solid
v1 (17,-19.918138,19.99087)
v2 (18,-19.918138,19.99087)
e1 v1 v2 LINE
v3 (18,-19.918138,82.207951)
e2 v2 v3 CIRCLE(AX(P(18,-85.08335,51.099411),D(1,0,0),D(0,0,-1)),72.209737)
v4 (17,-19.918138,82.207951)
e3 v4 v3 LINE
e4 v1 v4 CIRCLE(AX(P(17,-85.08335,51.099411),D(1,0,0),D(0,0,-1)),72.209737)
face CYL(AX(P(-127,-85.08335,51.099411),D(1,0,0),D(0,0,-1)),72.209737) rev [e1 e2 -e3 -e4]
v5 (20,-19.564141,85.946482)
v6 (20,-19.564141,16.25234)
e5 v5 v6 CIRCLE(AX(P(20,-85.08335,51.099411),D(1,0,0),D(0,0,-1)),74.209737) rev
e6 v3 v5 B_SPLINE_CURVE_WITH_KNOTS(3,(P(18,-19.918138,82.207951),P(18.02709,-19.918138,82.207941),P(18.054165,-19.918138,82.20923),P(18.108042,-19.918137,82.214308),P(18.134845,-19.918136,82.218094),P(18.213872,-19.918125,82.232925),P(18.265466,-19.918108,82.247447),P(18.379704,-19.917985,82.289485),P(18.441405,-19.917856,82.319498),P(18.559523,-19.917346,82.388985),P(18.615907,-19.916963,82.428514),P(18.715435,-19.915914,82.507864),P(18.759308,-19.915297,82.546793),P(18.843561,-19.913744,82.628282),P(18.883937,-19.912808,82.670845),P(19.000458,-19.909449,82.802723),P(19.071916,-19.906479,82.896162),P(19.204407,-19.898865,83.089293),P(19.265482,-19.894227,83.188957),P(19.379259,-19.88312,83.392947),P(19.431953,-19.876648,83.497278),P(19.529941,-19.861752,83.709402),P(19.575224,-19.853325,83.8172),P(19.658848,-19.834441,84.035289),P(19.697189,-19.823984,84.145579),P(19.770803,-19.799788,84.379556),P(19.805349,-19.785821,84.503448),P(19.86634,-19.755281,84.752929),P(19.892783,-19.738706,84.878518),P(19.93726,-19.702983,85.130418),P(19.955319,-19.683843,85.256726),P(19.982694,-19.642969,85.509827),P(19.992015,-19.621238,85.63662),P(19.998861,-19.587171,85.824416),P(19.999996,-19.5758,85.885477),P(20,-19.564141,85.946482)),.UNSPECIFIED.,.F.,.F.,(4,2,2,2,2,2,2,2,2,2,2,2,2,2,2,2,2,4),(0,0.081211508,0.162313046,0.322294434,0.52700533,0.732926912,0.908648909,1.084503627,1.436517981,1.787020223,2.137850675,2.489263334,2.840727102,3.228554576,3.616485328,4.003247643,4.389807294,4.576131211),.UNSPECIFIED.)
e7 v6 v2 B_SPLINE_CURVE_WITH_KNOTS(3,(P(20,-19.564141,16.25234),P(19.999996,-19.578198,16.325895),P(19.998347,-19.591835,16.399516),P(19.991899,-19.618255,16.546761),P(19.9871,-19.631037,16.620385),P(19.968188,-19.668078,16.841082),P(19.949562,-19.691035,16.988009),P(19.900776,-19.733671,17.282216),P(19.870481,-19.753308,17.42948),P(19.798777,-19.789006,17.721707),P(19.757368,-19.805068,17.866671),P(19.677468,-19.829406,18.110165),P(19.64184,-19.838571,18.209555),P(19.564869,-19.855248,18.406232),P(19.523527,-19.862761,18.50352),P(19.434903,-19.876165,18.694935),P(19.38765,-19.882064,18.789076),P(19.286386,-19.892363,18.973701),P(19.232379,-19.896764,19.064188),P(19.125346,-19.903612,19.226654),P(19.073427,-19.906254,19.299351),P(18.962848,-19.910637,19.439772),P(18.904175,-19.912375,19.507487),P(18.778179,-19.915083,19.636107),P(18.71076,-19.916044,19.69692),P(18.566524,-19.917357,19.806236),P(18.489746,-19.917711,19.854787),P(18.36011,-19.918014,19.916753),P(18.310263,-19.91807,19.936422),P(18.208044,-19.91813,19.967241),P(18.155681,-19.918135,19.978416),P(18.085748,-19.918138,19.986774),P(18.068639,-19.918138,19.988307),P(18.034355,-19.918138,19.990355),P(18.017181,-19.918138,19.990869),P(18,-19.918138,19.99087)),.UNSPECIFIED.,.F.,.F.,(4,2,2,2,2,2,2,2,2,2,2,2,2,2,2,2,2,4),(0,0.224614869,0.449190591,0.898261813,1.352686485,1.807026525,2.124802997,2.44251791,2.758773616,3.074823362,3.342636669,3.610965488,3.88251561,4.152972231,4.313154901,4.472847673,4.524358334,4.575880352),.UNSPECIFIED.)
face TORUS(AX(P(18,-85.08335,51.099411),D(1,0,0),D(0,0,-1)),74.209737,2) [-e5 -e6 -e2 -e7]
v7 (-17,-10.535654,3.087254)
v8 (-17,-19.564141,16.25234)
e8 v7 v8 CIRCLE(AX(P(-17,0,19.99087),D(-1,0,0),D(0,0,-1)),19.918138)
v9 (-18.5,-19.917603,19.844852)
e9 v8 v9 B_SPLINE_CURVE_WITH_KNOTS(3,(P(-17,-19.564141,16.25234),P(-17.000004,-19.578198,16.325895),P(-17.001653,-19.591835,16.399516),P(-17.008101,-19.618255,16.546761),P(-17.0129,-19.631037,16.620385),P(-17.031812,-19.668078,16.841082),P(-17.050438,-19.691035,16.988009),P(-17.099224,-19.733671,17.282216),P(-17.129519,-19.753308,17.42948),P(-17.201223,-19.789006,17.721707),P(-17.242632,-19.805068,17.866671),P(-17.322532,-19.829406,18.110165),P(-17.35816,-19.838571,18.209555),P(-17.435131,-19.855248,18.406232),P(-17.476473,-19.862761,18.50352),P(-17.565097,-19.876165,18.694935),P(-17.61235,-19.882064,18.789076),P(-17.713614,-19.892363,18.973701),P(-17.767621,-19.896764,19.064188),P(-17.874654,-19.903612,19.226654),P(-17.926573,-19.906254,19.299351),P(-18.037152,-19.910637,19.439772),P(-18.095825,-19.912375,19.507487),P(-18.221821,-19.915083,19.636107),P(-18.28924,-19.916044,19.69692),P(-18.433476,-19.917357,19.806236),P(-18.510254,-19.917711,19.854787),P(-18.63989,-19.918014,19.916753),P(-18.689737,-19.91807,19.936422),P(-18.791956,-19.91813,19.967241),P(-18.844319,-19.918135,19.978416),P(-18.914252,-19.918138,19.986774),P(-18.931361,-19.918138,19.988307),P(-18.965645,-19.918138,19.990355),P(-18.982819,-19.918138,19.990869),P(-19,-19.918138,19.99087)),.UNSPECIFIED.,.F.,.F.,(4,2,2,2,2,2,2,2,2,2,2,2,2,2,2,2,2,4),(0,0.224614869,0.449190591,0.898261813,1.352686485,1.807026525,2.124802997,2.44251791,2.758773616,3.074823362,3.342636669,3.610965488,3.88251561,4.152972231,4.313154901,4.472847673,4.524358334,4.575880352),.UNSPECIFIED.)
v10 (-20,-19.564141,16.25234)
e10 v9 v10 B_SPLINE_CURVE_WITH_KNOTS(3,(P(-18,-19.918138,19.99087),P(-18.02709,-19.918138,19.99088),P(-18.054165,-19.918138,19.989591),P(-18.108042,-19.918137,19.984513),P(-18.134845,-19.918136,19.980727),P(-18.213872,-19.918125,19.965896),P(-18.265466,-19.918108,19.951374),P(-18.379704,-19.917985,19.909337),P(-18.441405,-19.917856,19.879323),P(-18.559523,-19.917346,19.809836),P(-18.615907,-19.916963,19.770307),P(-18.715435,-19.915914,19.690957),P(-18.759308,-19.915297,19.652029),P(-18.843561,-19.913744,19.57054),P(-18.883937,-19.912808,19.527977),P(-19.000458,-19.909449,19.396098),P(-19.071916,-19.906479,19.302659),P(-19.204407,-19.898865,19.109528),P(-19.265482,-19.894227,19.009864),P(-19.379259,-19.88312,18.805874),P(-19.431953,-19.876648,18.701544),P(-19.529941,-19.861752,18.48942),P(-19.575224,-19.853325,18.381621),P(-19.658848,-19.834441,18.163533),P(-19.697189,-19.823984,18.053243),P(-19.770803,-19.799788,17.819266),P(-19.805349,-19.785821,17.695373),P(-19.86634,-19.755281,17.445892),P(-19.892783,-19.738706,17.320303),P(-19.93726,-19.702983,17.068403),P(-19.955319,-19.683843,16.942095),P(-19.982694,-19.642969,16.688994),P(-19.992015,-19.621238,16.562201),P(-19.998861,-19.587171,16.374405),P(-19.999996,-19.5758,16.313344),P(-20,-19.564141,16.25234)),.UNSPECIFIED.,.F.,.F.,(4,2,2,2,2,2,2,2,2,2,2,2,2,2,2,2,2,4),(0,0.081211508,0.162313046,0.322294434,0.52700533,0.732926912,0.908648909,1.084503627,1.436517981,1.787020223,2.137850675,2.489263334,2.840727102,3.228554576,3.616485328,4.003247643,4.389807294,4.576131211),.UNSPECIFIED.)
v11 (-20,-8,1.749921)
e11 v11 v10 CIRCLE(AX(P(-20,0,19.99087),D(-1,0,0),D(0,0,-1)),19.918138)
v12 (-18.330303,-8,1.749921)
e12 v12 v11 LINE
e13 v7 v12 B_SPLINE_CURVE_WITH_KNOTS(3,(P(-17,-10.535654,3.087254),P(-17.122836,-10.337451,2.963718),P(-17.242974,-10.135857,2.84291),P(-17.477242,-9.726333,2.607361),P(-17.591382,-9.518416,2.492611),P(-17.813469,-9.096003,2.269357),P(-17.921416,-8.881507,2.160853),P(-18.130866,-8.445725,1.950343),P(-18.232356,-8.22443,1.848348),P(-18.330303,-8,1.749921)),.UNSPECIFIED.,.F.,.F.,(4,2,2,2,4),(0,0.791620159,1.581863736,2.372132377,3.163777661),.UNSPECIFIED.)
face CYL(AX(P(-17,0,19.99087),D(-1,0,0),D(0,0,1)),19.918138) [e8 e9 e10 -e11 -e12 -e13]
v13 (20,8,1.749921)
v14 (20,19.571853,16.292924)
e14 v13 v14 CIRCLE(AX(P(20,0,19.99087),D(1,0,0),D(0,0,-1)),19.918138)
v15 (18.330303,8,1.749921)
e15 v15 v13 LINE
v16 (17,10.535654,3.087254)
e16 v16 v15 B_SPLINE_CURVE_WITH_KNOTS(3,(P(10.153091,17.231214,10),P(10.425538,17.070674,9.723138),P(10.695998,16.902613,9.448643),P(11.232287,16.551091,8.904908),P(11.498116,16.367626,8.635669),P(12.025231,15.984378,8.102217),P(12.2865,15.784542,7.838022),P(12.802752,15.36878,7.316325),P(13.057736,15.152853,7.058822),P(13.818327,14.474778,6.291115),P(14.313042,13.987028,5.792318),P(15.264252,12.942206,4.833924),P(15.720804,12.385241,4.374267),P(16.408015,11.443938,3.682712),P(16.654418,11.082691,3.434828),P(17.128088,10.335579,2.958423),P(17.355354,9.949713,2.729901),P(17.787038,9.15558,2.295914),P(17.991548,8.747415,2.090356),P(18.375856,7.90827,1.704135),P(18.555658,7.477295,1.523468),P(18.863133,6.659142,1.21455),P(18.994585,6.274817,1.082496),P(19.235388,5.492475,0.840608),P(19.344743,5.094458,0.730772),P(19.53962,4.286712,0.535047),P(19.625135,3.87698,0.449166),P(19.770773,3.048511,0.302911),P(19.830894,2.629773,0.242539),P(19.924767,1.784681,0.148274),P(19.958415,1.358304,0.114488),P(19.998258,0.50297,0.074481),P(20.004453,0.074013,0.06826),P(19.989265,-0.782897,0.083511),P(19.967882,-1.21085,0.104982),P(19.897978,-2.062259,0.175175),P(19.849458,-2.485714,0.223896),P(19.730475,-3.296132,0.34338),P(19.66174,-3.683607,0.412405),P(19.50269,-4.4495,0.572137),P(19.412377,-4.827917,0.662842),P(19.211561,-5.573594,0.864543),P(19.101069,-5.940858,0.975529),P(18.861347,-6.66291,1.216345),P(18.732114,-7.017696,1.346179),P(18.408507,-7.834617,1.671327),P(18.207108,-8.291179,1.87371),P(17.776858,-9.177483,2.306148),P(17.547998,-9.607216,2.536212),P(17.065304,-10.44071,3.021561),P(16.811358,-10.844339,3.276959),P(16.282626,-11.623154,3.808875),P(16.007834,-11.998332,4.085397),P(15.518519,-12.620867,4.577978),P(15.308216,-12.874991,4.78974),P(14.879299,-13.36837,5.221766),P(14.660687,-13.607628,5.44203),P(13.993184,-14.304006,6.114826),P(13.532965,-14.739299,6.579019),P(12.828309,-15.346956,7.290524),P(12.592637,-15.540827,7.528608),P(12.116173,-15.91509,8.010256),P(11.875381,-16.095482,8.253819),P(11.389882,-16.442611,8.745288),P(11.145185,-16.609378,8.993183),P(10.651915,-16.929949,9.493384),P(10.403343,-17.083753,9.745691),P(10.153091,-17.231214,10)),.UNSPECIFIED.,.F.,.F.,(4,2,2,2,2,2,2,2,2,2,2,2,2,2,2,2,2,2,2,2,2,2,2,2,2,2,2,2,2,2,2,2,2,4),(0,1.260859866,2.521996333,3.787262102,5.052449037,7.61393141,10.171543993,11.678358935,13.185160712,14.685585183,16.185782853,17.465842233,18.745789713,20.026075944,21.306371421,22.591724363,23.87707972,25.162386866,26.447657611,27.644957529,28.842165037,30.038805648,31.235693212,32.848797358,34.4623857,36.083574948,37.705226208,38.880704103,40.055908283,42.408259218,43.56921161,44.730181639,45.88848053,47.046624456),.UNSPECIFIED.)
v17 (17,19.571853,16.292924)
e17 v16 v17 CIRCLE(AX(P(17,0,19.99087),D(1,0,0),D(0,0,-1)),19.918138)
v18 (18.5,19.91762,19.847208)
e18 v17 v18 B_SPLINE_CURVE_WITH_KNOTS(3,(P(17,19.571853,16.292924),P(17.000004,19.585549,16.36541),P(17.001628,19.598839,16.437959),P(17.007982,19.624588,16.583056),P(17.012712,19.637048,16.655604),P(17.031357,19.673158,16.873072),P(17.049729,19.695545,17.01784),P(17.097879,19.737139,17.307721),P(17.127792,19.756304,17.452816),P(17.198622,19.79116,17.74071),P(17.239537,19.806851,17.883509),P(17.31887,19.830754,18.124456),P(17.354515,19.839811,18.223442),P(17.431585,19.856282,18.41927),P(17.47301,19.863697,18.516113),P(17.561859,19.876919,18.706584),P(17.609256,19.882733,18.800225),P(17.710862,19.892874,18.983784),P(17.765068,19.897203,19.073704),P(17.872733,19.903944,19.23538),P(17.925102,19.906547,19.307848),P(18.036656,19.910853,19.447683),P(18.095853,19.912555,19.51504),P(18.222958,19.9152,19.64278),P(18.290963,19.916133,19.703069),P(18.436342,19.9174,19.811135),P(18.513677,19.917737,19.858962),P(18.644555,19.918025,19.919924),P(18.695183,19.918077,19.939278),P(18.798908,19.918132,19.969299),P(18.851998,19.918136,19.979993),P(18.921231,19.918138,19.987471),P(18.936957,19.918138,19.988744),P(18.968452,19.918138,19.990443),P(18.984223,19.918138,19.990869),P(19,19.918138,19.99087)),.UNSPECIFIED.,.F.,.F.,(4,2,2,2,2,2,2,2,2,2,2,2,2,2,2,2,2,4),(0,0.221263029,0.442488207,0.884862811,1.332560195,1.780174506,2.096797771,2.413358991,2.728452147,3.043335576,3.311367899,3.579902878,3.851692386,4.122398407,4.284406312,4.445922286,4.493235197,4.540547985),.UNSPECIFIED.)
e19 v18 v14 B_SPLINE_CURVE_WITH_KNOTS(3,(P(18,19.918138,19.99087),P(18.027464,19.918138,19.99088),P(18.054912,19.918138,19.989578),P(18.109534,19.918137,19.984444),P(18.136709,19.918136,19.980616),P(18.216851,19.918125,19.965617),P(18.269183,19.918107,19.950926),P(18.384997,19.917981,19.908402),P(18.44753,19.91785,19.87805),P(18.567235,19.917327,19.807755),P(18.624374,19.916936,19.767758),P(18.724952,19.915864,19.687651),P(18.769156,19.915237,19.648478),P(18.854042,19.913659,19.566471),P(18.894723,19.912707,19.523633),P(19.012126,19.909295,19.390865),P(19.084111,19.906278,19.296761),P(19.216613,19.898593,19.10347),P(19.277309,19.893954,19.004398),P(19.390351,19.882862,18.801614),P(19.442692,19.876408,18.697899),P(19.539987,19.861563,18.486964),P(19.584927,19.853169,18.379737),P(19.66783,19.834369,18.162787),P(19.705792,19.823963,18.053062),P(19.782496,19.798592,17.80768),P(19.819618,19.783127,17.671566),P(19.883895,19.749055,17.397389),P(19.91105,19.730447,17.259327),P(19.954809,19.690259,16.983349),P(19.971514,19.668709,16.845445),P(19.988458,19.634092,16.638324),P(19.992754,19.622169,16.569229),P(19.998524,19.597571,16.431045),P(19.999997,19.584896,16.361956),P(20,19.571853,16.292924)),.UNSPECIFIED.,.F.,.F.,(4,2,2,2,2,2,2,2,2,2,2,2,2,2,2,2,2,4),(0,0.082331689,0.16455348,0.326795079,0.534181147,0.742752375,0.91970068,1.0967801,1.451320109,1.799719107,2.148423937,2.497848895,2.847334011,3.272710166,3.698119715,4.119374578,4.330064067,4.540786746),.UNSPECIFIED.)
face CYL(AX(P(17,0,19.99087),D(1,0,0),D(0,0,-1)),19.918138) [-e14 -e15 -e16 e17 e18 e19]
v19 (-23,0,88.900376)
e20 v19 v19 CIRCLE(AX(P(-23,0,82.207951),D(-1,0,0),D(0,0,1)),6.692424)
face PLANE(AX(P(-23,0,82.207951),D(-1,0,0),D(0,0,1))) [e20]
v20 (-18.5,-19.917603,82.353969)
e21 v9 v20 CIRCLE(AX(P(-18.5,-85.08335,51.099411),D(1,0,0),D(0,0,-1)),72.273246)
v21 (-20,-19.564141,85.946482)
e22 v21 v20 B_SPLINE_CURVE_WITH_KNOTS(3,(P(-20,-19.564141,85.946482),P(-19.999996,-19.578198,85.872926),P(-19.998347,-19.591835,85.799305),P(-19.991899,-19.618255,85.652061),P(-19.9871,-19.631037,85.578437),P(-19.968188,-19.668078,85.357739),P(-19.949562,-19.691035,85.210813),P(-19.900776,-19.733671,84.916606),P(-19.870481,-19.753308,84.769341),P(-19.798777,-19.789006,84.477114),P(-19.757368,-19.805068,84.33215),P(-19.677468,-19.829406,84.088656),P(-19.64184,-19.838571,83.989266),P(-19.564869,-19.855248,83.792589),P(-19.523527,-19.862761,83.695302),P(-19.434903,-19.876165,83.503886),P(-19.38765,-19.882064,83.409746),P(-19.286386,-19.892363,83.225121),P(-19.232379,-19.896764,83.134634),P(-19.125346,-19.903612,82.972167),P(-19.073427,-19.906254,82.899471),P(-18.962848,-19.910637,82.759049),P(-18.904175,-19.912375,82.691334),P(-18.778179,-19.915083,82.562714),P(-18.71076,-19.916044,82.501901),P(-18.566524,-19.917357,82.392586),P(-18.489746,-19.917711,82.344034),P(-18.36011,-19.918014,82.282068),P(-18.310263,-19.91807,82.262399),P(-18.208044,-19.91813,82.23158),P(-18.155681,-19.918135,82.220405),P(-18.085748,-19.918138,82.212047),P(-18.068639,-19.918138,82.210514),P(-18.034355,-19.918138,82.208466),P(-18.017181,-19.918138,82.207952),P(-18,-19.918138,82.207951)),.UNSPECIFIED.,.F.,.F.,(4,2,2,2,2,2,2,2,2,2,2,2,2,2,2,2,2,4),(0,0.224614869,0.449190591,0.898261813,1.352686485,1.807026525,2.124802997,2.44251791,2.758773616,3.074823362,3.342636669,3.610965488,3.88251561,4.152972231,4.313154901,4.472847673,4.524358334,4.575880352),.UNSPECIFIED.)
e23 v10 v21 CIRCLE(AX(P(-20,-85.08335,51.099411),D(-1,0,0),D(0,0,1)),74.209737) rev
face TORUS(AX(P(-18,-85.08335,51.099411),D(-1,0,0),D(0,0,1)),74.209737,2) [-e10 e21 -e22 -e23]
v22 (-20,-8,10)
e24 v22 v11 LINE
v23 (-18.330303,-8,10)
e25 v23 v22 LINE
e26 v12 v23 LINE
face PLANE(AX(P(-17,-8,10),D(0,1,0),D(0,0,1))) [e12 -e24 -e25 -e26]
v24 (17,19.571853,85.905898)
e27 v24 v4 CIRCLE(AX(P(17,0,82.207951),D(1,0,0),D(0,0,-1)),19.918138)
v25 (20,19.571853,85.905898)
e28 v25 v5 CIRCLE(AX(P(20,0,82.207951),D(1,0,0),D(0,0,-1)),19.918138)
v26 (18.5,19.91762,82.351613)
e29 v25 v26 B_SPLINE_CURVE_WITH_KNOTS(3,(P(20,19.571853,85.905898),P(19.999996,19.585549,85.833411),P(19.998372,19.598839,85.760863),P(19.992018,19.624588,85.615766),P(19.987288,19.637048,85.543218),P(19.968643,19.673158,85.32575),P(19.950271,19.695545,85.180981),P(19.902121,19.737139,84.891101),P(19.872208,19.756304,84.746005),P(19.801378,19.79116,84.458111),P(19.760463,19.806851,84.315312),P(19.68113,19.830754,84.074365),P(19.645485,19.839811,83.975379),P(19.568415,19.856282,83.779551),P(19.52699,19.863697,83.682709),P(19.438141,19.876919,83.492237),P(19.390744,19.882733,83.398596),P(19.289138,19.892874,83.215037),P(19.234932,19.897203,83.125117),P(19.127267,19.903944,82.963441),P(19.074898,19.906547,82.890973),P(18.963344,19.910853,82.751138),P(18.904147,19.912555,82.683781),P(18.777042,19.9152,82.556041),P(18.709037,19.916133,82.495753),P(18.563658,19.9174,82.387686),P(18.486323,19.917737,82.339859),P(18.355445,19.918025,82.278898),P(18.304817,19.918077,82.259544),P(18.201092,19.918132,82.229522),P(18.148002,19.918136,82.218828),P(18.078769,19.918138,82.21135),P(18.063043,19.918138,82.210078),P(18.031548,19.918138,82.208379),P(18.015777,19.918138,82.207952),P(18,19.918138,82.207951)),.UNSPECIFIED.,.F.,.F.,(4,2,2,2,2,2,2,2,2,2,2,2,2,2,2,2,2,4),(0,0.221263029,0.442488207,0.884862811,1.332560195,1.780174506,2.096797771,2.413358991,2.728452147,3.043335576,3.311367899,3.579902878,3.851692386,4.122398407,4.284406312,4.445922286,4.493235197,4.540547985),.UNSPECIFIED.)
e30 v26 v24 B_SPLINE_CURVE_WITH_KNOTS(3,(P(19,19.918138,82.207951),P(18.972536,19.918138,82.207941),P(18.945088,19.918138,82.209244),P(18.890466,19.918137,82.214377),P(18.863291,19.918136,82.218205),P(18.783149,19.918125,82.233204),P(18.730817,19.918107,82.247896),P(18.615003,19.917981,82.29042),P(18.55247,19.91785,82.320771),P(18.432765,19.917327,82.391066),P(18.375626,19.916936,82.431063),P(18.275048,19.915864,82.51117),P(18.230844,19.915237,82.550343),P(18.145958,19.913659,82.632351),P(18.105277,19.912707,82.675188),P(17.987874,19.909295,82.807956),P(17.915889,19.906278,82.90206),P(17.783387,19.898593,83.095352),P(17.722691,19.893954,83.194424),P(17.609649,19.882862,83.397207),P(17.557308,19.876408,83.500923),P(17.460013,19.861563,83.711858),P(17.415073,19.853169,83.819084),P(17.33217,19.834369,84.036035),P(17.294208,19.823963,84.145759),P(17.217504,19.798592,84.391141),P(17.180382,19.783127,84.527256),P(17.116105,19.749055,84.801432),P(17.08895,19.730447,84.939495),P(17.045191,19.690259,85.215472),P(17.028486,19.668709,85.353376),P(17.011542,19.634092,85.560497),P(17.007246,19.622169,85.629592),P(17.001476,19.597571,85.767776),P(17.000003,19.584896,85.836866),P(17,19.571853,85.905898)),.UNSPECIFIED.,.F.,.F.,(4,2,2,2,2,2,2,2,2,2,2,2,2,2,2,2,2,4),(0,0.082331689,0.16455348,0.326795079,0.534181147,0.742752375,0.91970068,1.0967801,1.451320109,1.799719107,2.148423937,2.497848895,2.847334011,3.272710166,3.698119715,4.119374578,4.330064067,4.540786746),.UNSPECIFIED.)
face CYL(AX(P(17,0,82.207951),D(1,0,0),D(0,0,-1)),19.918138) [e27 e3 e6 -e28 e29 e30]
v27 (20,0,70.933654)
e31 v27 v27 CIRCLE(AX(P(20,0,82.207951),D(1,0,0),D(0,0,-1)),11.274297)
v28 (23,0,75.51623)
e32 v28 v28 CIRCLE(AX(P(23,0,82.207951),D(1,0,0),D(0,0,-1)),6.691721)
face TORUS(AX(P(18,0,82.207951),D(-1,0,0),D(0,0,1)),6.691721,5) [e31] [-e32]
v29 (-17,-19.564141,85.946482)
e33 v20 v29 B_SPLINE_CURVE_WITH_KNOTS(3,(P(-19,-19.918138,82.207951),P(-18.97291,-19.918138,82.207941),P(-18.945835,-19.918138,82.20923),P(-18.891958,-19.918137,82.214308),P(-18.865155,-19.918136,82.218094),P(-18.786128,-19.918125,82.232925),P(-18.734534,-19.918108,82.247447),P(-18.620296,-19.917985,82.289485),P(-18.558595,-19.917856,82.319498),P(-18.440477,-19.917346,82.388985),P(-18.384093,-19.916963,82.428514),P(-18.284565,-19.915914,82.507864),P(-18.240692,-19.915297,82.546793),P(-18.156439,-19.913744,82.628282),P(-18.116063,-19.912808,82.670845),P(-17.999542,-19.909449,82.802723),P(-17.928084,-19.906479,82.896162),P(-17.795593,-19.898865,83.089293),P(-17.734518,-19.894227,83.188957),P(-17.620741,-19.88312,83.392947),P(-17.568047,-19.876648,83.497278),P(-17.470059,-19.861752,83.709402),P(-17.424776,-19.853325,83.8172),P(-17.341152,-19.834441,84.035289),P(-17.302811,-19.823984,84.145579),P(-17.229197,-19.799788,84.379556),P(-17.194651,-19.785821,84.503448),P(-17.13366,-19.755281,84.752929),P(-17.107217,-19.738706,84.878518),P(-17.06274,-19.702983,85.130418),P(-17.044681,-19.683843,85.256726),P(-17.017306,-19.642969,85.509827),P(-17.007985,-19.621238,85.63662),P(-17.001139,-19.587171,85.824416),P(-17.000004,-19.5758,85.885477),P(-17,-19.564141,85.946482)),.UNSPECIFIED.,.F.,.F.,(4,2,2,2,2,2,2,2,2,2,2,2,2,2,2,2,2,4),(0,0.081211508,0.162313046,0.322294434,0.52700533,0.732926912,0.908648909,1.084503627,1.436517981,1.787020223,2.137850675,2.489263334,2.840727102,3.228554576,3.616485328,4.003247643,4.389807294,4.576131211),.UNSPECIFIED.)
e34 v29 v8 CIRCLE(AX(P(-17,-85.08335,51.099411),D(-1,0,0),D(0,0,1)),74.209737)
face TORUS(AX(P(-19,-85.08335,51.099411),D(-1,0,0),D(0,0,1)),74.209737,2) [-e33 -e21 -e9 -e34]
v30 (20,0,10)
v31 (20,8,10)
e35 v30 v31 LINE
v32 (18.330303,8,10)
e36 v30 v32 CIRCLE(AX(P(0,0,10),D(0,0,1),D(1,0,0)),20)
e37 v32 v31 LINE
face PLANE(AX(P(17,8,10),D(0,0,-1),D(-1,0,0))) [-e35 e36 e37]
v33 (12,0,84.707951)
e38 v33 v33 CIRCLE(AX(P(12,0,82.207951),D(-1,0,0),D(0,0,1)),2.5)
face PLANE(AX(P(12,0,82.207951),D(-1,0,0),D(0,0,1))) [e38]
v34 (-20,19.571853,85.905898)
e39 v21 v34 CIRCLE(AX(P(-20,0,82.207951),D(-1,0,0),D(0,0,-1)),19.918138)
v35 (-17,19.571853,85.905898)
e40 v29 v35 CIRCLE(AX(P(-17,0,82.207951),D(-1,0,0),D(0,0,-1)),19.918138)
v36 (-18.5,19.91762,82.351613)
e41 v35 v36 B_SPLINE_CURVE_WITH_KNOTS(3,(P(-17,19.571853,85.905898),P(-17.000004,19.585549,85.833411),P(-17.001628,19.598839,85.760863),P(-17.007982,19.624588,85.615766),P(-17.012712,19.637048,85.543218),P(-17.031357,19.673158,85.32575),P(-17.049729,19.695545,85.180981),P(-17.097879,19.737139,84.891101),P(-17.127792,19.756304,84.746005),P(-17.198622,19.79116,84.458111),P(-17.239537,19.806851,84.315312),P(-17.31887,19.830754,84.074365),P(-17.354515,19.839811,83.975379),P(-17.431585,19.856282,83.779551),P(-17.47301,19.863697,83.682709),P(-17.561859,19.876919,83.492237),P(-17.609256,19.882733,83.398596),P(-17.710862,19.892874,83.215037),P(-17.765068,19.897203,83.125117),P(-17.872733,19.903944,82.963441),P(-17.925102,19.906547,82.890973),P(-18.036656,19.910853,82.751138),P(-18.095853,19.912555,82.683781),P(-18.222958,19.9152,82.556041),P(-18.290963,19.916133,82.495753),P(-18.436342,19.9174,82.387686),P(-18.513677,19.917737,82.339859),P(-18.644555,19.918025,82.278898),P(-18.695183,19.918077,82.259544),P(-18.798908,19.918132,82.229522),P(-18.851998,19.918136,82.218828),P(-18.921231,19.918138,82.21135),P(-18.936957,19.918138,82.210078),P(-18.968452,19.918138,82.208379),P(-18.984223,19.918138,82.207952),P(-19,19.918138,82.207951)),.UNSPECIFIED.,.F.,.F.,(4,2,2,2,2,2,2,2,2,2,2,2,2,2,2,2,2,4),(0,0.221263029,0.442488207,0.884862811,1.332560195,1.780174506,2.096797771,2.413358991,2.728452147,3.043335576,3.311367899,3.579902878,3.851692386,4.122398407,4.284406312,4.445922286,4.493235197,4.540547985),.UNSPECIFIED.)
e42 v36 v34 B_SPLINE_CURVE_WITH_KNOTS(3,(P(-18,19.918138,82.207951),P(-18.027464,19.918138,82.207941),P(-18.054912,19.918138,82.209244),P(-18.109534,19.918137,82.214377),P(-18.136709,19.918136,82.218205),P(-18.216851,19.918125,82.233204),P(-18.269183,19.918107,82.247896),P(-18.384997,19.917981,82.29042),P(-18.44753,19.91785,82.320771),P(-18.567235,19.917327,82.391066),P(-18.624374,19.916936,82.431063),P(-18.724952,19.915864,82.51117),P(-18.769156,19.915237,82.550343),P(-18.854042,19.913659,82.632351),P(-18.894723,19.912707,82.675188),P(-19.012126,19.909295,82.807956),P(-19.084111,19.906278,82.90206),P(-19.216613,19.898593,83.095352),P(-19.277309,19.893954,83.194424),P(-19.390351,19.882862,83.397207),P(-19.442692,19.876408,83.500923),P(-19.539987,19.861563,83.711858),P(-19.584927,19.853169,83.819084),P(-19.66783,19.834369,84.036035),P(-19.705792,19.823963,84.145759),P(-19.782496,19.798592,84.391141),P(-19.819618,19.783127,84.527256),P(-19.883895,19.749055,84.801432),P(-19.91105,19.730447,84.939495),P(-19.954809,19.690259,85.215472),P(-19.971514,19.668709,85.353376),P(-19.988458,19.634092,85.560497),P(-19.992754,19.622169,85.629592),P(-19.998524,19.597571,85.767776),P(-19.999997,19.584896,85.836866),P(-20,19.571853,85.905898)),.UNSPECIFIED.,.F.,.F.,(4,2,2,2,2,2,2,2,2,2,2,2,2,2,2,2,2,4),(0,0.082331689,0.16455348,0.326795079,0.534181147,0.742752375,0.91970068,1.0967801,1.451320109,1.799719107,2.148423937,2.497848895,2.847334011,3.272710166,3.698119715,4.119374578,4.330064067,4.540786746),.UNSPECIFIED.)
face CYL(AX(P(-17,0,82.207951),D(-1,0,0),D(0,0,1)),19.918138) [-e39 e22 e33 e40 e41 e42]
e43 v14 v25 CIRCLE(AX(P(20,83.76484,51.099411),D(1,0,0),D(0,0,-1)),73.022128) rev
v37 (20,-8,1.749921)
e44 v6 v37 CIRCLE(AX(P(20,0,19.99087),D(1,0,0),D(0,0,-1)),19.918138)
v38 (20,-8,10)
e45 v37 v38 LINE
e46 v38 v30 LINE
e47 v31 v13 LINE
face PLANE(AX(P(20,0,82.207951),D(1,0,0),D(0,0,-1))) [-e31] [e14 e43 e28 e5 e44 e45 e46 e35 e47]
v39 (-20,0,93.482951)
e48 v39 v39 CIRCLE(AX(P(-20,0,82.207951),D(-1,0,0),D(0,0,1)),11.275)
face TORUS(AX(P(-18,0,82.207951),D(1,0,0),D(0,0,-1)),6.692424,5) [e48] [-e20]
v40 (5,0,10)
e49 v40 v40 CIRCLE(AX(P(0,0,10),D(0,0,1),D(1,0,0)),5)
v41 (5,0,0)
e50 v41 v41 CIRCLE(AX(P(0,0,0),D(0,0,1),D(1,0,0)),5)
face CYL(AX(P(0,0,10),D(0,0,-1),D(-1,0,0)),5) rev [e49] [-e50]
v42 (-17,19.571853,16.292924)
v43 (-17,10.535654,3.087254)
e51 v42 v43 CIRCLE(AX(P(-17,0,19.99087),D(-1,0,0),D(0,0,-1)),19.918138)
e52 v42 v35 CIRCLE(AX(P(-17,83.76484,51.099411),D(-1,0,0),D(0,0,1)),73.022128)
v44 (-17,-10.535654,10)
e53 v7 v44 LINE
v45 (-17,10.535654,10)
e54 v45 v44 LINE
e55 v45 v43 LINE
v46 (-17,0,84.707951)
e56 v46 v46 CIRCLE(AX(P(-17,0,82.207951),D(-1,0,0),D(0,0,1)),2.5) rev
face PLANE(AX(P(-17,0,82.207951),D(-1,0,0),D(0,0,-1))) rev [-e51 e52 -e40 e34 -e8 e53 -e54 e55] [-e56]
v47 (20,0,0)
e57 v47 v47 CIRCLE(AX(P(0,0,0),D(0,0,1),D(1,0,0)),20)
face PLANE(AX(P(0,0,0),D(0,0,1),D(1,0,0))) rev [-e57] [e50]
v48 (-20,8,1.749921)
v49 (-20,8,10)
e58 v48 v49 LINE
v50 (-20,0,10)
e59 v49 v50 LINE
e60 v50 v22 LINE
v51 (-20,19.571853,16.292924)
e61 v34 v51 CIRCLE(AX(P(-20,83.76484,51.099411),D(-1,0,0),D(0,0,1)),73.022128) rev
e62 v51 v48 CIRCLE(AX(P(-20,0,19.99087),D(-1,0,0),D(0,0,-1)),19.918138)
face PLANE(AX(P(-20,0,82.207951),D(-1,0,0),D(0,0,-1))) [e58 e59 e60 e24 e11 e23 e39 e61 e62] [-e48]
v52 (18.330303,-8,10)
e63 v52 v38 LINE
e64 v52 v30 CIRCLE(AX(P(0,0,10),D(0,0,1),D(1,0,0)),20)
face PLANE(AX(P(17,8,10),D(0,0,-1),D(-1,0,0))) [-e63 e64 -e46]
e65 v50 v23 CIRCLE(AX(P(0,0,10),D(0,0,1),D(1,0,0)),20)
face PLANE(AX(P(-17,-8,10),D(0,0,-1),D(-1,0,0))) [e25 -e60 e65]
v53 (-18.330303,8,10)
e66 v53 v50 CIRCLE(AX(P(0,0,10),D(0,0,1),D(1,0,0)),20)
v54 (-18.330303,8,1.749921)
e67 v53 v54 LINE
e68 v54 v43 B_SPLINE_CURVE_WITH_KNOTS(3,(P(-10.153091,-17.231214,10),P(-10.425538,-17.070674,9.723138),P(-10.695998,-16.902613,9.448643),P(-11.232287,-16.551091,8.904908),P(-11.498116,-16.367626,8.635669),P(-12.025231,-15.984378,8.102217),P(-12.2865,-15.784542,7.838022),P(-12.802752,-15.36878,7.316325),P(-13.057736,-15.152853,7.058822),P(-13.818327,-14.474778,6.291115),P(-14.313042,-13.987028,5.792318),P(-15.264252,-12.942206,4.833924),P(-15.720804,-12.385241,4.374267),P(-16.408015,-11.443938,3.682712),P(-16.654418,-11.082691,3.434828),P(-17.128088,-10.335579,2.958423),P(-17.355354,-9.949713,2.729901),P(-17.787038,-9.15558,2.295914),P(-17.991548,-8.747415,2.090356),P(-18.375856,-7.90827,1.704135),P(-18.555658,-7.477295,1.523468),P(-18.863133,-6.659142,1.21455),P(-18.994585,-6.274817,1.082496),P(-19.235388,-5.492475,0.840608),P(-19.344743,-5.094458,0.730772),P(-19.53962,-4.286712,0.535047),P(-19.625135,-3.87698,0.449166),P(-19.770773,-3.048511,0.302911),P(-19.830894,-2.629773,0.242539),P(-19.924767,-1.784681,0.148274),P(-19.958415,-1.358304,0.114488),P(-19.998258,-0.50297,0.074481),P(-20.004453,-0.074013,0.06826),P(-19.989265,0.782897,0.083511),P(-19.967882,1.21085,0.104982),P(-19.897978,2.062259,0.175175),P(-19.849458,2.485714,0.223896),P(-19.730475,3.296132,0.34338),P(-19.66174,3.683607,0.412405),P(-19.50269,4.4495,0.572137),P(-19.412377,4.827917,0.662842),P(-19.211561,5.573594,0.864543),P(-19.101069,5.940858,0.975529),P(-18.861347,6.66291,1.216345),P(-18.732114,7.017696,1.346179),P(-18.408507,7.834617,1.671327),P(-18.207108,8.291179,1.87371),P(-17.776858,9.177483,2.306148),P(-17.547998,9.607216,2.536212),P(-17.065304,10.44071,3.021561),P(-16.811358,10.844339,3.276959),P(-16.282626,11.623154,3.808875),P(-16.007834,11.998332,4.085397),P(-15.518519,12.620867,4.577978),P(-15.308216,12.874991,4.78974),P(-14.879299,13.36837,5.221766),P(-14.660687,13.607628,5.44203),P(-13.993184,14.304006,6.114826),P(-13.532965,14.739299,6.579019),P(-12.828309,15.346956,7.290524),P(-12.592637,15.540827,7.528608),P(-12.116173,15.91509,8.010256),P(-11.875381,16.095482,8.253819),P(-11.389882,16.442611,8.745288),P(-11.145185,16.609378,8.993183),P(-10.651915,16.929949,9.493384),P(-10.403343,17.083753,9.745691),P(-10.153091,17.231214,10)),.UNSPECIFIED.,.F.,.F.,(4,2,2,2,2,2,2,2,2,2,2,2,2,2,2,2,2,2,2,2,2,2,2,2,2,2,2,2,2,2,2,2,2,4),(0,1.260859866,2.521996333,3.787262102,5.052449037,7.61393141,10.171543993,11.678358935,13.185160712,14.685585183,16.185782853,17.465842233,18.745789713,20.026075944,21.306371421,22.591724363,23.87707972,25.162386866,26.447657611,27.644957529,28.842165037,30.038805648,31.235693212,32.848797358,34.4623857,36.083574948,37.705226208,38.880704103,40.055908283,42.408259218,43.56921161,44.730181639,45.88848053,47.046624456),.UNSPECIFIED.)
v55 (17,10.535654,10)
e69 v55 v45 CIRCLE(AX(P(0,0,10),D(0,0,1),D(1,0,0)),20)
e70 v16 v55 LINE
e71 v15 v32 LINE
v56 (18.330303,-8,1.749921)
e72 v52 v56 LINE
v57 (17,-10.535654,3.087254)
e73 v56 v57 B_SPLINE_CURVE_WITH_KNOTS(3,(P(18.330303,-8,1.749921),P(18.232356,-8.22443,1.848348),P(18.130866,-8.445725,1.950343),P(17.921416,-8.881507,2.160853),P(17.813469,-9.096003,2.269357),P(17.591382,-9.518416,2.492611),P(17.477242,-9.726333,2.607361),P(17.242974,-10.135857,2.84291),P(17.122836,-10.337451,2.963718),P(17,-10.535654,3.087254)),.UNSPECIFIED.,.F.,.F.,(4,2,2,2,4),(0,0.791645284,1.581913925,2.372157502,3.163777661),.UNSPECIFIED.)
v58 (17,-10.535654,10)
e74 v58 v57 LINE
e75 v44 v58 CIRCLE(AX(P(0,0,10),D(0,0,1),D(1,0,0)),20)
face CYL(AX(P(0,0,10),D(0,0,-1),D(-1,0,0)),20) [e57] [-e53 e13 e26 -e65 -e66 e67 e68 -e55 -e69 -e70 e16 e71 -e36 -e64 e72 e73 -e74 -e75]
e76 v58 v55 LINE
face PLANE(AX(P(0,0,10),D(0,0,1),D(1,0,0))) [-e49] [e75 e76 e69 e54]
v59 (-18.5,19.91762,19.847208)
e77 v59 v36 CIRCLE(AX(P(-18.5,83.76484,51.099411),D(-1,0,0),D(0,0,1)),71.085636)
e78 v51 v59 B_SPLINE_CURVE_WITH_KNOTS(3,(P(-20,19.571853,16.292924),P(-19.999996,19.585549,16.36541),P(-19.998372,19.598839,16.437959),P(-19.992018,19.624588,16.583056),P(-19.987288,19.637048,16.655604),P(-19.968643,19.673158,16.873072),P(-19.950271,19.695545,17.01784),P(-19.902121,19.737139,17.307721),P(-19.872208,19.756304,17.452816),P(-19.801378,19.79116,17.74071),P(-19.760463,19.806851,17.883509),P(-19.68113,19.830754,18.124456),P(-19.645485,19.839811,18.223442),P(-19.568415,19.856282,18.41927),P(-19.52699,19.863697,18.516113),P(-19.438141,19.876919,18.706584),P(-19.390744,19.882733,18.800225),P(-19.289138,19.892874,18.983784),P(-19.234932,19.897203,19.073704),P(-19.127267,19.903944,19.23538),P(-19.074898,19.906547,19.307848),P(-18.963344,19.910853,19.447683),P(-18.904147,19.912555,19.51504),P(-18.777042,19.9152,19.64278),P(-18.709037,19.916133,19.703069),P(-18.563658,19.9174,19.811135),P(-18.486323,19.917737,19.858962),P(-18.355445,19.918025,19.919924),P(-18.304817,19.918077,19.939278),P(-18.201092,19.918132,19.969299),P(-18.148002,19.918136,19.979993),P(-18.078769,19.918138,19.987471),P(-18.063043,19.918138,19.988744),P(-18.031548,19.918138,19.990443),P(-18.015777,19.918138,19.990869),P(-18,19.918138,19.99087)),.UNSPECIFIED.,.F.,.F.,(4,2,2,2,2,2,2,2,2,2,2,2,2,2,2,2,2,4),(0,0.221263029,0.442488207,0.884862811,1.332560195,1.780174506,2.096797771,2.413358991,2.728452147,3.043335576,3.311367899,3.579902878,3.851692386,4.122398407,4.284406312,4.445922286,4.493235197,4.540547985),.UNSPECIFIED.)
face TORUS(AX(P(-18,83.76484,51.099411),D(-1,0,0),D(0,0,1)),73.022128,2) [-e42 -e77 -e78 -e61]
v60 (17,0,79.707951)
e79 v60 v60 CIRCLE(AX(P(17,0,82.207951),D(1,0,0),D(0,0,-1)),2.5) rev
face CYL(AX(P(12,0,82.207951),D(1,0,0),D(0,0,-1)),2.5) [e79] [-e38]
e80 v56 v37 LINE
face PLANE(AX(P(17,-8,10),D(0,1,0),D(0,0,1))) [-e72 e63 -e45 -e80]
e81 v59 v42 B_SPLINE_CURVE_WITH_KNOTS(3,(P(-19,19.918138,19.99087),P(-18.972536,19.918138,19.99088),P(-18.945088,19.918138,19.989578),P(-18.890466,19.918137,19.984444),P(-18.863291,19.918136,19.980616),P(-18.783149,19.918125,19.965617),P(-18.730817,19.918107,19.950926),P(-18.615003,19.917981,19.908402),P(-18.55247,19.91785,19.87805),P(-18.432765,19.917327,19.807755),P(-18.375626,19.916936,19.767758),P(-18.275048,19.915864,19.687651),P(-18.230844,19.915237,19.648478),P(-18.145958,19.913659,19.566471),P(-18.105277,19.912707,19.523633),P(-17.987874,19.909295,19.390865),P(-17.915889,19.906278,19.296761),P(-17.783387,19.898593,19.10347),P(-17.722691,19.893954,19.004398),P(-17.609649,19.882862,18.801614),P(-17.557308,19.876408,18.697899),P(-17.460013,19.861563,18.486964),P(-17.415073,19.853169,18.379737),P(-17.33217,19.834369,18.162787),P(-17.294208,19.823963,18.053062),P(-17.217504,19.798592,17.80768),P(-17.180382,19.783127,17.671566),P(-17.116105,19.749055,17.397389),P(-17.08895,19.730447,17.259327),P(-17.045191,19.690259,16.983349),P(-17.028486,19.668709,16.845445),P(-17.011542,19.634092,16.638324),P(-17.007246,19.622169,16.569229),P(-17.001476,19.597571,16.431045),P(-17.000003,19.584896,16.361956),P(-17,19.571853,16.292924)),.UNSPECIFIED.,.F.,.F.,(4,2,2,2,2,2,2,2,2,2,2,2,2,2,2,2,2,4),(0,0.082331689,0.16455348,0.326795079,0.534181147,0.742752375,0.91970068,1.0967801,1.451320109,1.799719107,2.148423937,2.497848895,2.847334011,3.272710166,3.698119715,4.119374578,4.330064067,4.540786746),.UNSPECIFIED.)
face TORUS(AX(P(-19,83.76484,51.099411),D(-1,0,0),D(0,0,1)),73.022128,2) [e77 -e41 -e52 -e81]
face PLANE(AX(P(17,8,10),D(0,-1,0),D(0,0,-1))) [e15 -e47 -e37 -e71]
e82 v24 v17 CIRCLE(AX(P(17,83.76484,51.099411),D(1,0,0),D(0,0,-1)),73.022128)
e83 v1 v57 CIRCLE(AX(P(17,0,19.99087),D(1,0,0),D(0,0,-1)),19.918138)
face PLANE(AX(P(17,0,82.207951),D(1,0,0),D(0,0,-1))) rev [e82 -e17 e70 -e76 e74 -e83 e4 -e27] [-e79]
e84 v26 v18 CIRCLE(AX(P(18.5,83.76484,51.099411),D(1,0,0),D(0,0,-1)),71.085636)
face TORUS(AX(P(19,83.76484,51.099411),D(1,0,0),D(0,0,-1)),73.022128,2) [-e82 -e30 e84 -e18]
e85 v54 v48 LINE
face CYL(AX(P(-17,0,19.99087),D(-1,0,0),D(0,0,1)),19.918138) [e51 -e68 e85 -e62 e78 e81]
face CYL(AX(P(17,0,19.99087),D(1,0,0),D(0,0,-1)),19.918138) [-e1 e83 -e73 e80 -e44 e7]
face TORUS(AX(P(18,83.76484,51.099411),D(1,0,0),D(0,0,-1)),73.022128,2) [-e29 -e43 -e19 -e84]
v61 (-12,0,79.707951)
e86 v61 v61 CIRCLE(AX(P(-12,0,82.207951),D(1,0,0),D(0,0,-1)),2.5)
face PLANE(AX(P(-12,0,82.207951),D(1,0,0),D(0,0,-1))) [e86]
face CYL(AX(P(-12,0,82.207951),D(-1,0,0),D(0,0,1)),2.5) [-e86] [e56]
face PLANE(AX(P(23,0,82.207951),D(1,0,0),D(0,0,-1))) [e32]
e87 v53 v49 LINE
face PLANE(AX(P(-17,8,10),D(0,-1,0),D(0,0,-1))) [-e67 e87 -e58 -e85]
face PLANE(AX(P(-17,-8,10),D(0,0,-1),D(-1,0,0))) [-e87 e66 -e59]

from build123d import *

# Parameters (mm, degrees)
SKETCH2_R           = 20
SKETCH2_R_2         = 5
BOSS_EXTRUDE1_DEPTH = 10
BOSS_EXTRUDE2_DEPTH = 3
CIRPATTERN1_COUNT   = 2
SKETCH5_R           = 2.5
BOSS_EXTRUDE3_DEPTH = 5
BOSS_EXTRUDE4_START = 5
SKETCH6_R           = 2.5
BOSS_EXTRUDE4_DEPTH = 5
CUT_EXTRUDE1_DEPTH  = 147
FILLET1_R           = 2
SKETCH8_R           = 11.27429685
BOSS_EXTRUDE5_DEPTH = 3
FILLET2_R           = 5
SKETCH9_R           = 11.275
BOSS_EXTRUDE6_DEPTH = 3
FILLET3_R           = 5


with BuildPart() as part:
    # Sketch2 → Boss-Extrude1 (new body)
    with BuildSketch(Plane.XY):
        Circle(SKETCH2_R)
        Circle(SKETCH2_R_2, mode=Mode.SUBTRACT)
    extrude(amount=BOSS_EXTRUDE1_DEPTH)

    # Sketch4 → Boss-Extrude2 (add)
    with BuildSketch(Plane(origin=(20, 0, 0), x_dir=(0, 0, -1), z_dir=(1, 0, 0))):
        with BuildLine():
            Line((-82.207951234, 19.918138143), (-19.990870076, 19.918138143))
            ThreePointArc((-19.990870076, 19.918138143), (-9.096212625, 16.67449148), (-1.749920893, 8))
            Line((-1.749920893, 8), (-10, 8))
            Line((-10, 8), (-10, -8))
            Line((-10, -8), (-1.749920893, -8))
            ThreePointArc((-1.749920893, -8), (-9.096212625, -16.67449148), (-19.990870076, -19.918138143))
            Line((-19.990870076, -19.918138143), (-82.207951234, -19.918138143))
            ThreePointArc((-82.207951234, -19.918138143), (-102.126089377, 0), (-82.207951234, 19.918138143))
        make_face()
    boss_extrude2 = extrude(amount=-BOSS_EXTRUDE2_DEPTH)

    # CirPattern1: Boss-Extrude2 ×2 about axis
    cirpattern1_axis = Axis((0, 0, 0), (0, 0, 1))
    for i in range(1, CIRPATTERN1_COUNT):
        add(boss_extrude2.rotate(cirpattern1_axis, i * 360 / CIRPATTERN1_COUNT))

    # Sketch5 → Boss-Extrude3 (add)
    with BuildSketch(Plane(origin=(-17, 0, 0), x_dir=(0, 0, -1), z_dir=(1, 0, 0))):
        with Locations(Location((-82.207951234, 0, 0), (0, 0, 180))):
            Circle(SKETCH5_R)
    extrude(amount=BOSS_EXTRUDE3_DEPTH)

    # Sketch6 → Boss-Extrude4 (add)
    with BuildSketch(Plane.ZY.offset(-17).offset(BOSS_EXTRUDE4_START)):
        with Locations((82.207951234, 0)):
            Circle(SKETCH6_R)
    extrude(amount=-BOSS_EXTRUDE4_DEPTH)

    # Sketch7 → Cut-Extrude1 (cut)
    with BuildSketch(Plane(origin=(20, 0, 0), x_dir=(0, 0, -1), z_dir=(1, 0, 0))):
        with BuildLine():
            Line((-82.207951234, 19.918138143), (-19.990870076, 19.918138143))
            ThreePointArc((-19.990870076, 19.918138143), (-51.099410655, 12.742712192), (-82.207951234, 19.918138143))
        make_face()
        with BuildLine():
            Line((-82.207951234, -19.918138143), (-19.990870076, -19.918138143))
            ThreePointArc((-19.990870076, -19.918138143), (-51.099410655, -12.873612926), (-82.207951234, -19.918138143))
        make_face()
    extrude(amount=-CUT_EXTRUDE1_DEPTH, mode=Mode.SUBTRACT)

    # Fillet1
    # the kernel refuses this fillet: 2 mm, written as the material it takes off along each edge
    with BuildSketch(Plane(origin=(-20, -85.083350362, 51.099410655), x_dir=(0, 0.8704701074712403, -0.49222128356970424), z_dir=(0, -0.49222128356970424, -0.8704701074712403))) as fillet1_piece_1:
        with BuildLine():
            CenterArc((72.209737436 + FILLET1_R, FILLET1_R), FILLET1_R, 180, 90)
            Line((72.209737436 + FILLET1_R, 0), (72.209737436, 0))
            Line((72.209737436, 0), (72.209737436, FILLET1_R))
        make_face()
    revolve(axis=Axis((-20, -85.083350362, 51.099410655), (1, 0, 0)), revolution_arc=58.973369899, mode=Mode.SUBTRACT)
    with BuildSketch(Plane(origin=(-17, -85.083350362, 51.099410655), x_dir=(0, 0.8704701074712403, -0.49222128356970424), z_dir=(0, -0.49222128356970424, -0.8704701074712403))) as fillet1_piece_2:
        with BuildLine():
            CenterArc((72.209737436 + FILLET1_R, -FILLET1_R), FILLET1_R, 90, 90)
            Line((72.209737436, -FILLET1_R), (72.209737436, 0))
            Line((72.209737436, 0), (72.209737436 + FILLET1_R, 0))
        make_face()
    revolve(axis=Axis((-17, -85.083350362, 51.099410655), (1, 0, 0)), revolution_arc=58.973369899, mode=Mode.SUBTRACT)
    with BuildSketch(Plane(origin=(-17, 83.764839764, 51.099410655), x_dir=(0, -0.8659267657003706, 0.5001708072685723), z_dir=(0, 0.5001708072685723, 0.8659267657003706))) as fillet1_piece_3:
        with BuildLine():
            CenterArc((71.022127572 + FILLET1_R, -FILLET1_R), FILLET1_R, 90, 90)
            Line((71.022127572, -FILLET1_R), (71.022127572, 0))
            Line((71.022127572, 0), (71.022127572 + FILLET1_R, 0))
        make_face()
    revolve(axis=Axis((-17, 83.764839764, 51.099410655), (1, 0, 0)), revolution_arc=60.022602323, mode=Mode.SUBTRACT)
    with BuildSketch(Plane(origin=(-20, 83.764839764, 51.099410655), x_dir=(0, -0.8659267657003706, 0.5001708072685723), z_dir=(0, 0.5001708072685723, 0.8659267657003706))) as fillet1_piece_4:
        with BuildLine():
            CenterArc((71.022127572 + FILLET1_R, FILLET1_R), FILLET1_R, 180, 90)
            Line((71.022127572 + FILLET1_R, 0), (71.022127572, 0))
            Line((71.022127572, 0), (71.022127572, FILLET1_R))
        make_face()
    revolve(axis=Axis((-20, 83.764839764, 51.099410655), (1, 0, 0)), revolution_arc=60.022602323, mode=Mode.SUBTRACT)
    with BuildSketch(Plane(origin=(17, 83.764839764, 51.099410655), x_dir=(0, -0.8659267657003706, 0.5001708072685723), z_dir=(0, 0.5001708072685723, 0.8659267657003706))) as fillet1_piece_5:
        with BuildLine():
            CenterArc((71.022127572 + FILLET1_R, FILLET1_R), FILLET1_R, 180, 90)
            Line((71.022127572, FILLET1_R), (71.022127572, 0))
            Line((71.022127572, 0), (71.022127572 + FILLET1_R, 0))
        make_face()
    revolve(axis=Axis((17, 83.764839764, 51.099410655), (1, 0, 0)), revolution_arc=60.022602323, mode=Mode.SUBTRACT)
    with BuildSketch(Plane(origin=(20, -85.083350362, 51.099410655), x_dir=(0, 0.8704701074712403, -0.49222128356970424), z_dir=(0, -0.49222128356970424, -0.8704701074712403))) as fillet1_piece_6:
        with BuildLine():
            CenterArc((72.209737436 + FILLET1_R, -FILLET1_R), FILLET1_R, 90, 90)
            Line((72.209737436, -FILLET1_R), (72.209737436, 0))
            Line((72.209737436, 0), (72.209737436 + FILLET1_R, 0))
        make_face()
    revolve(axis=Axis((20, -85.083350362, 51.099410655), (1, 0, 0)), revolution_arc=58.973369899, mode=Mode.SUBTRACT)
    with BuildSketch(Plane(origin=(20, 83.764839764, 51.099410655), x_dir=(0, -0.8659267657003705, -0.5001708072685725), z_dir=(0, 0.5001708072685725, -0.8659267657003705))) as fillet1_piece_7:
        with BuildLine():
            CenterArc((71.022127572 + FILLET1_R, FILLET1_R), FILLET1_R, 180, 90)
            Line((71.022127572, FILLET1_R), (71.022127572, 0))
            Line((71.022127572, 0), (71.022127572 + FILLET1_R, 0))
        make_face()
    revolve(axis=Axis((20, 83.764839764, 51.099410655), (-1, 0, 0)), revolution_arc=60.022602323, mode=Mode.SUBTRACT)

    # Sketch8 → Boss-Extrude5 (add)
    with BuildSketch(Plane(origin=(20, 0, 0), x_dir=(0, 0, -1), z_dir=(1, 0, 0))):
        with Locations((-82.207951234, 0)):
            Circle(SKETCH8_R)
    extrude(amount=BOSS_EXTRUDE5_DEPTH)

    # Fillet2
    # the kernel refuses this fillet: 5 mm, written as the material it takes off along each edge
    with BuildSketch(Plane(origin=(23, 0, 82.207951234), x_dir=(0, 0, -1), z_dir=(0, -1, 0))) as fillet2_piece_1:
        with BuildLine():
            CenterArc((6.691721155, -5), FILLET2_R, 23.578178478, 66.421821522)
            Line((6.691721155, 0), (6.691721155, 0.1))
            Line((6.691721155, 0.1), (11.27429685, 0.1))
            Line((11.27429685, 0.1), (11.37429685, 0))
            ThreePointArc((11.37429685, 0), (11.37429685, -1.5), (11.365948364, -2.96))
            Line((11.365948364, -2.96), (11.27429685, -3))
        make_face()
    revolve(axis=Axis((23, 0, 82.207951234), (1, 0, 0)), mode=Mode.SUBTRACT)

    # Sketch9 → Boss-Extrude6 (add)
    with BuildSketch(Plane.ZY.offset(20)):
        with Locations((82.207951234, 0)):
            Circle(SKETCH9_R)
    extrude(amount=BOSS_EXTRUDE6_DEPTH)

    # Fillet3
    # the kernel refuses this fillet: 5 mm, written as the material it takes off along each edge
    with BuildSketch(Plane(origin=(-23, 0, 82.207951234), x_dir=(0, 0, 1), z_dir=(0, -1, 0))) as fillet3_piece_1:
        with BuildLine():
            CenterArc((6.692424305, -5), FILLET3_R, 23.578178478, 66.421821522)
            Line((6.692424305, 0), (6.692424305, 0.1))
            Line((6.692424305, 0.1), (11.275, 0.1))
            Line((11.275, 0.1), (11.375, 0))
            ThreePointArc((11.375, 0), (11.375, -1.5), (11.366651514, -2.96))
            Line((11.366651514, -2.96), (11.275, -3))
        make_face()
    revolve(axis=Axis((-23, 0, 82.207951234), (-1, 0, 0)), mode=Mode.SUBTRACT)


solid = part.part
